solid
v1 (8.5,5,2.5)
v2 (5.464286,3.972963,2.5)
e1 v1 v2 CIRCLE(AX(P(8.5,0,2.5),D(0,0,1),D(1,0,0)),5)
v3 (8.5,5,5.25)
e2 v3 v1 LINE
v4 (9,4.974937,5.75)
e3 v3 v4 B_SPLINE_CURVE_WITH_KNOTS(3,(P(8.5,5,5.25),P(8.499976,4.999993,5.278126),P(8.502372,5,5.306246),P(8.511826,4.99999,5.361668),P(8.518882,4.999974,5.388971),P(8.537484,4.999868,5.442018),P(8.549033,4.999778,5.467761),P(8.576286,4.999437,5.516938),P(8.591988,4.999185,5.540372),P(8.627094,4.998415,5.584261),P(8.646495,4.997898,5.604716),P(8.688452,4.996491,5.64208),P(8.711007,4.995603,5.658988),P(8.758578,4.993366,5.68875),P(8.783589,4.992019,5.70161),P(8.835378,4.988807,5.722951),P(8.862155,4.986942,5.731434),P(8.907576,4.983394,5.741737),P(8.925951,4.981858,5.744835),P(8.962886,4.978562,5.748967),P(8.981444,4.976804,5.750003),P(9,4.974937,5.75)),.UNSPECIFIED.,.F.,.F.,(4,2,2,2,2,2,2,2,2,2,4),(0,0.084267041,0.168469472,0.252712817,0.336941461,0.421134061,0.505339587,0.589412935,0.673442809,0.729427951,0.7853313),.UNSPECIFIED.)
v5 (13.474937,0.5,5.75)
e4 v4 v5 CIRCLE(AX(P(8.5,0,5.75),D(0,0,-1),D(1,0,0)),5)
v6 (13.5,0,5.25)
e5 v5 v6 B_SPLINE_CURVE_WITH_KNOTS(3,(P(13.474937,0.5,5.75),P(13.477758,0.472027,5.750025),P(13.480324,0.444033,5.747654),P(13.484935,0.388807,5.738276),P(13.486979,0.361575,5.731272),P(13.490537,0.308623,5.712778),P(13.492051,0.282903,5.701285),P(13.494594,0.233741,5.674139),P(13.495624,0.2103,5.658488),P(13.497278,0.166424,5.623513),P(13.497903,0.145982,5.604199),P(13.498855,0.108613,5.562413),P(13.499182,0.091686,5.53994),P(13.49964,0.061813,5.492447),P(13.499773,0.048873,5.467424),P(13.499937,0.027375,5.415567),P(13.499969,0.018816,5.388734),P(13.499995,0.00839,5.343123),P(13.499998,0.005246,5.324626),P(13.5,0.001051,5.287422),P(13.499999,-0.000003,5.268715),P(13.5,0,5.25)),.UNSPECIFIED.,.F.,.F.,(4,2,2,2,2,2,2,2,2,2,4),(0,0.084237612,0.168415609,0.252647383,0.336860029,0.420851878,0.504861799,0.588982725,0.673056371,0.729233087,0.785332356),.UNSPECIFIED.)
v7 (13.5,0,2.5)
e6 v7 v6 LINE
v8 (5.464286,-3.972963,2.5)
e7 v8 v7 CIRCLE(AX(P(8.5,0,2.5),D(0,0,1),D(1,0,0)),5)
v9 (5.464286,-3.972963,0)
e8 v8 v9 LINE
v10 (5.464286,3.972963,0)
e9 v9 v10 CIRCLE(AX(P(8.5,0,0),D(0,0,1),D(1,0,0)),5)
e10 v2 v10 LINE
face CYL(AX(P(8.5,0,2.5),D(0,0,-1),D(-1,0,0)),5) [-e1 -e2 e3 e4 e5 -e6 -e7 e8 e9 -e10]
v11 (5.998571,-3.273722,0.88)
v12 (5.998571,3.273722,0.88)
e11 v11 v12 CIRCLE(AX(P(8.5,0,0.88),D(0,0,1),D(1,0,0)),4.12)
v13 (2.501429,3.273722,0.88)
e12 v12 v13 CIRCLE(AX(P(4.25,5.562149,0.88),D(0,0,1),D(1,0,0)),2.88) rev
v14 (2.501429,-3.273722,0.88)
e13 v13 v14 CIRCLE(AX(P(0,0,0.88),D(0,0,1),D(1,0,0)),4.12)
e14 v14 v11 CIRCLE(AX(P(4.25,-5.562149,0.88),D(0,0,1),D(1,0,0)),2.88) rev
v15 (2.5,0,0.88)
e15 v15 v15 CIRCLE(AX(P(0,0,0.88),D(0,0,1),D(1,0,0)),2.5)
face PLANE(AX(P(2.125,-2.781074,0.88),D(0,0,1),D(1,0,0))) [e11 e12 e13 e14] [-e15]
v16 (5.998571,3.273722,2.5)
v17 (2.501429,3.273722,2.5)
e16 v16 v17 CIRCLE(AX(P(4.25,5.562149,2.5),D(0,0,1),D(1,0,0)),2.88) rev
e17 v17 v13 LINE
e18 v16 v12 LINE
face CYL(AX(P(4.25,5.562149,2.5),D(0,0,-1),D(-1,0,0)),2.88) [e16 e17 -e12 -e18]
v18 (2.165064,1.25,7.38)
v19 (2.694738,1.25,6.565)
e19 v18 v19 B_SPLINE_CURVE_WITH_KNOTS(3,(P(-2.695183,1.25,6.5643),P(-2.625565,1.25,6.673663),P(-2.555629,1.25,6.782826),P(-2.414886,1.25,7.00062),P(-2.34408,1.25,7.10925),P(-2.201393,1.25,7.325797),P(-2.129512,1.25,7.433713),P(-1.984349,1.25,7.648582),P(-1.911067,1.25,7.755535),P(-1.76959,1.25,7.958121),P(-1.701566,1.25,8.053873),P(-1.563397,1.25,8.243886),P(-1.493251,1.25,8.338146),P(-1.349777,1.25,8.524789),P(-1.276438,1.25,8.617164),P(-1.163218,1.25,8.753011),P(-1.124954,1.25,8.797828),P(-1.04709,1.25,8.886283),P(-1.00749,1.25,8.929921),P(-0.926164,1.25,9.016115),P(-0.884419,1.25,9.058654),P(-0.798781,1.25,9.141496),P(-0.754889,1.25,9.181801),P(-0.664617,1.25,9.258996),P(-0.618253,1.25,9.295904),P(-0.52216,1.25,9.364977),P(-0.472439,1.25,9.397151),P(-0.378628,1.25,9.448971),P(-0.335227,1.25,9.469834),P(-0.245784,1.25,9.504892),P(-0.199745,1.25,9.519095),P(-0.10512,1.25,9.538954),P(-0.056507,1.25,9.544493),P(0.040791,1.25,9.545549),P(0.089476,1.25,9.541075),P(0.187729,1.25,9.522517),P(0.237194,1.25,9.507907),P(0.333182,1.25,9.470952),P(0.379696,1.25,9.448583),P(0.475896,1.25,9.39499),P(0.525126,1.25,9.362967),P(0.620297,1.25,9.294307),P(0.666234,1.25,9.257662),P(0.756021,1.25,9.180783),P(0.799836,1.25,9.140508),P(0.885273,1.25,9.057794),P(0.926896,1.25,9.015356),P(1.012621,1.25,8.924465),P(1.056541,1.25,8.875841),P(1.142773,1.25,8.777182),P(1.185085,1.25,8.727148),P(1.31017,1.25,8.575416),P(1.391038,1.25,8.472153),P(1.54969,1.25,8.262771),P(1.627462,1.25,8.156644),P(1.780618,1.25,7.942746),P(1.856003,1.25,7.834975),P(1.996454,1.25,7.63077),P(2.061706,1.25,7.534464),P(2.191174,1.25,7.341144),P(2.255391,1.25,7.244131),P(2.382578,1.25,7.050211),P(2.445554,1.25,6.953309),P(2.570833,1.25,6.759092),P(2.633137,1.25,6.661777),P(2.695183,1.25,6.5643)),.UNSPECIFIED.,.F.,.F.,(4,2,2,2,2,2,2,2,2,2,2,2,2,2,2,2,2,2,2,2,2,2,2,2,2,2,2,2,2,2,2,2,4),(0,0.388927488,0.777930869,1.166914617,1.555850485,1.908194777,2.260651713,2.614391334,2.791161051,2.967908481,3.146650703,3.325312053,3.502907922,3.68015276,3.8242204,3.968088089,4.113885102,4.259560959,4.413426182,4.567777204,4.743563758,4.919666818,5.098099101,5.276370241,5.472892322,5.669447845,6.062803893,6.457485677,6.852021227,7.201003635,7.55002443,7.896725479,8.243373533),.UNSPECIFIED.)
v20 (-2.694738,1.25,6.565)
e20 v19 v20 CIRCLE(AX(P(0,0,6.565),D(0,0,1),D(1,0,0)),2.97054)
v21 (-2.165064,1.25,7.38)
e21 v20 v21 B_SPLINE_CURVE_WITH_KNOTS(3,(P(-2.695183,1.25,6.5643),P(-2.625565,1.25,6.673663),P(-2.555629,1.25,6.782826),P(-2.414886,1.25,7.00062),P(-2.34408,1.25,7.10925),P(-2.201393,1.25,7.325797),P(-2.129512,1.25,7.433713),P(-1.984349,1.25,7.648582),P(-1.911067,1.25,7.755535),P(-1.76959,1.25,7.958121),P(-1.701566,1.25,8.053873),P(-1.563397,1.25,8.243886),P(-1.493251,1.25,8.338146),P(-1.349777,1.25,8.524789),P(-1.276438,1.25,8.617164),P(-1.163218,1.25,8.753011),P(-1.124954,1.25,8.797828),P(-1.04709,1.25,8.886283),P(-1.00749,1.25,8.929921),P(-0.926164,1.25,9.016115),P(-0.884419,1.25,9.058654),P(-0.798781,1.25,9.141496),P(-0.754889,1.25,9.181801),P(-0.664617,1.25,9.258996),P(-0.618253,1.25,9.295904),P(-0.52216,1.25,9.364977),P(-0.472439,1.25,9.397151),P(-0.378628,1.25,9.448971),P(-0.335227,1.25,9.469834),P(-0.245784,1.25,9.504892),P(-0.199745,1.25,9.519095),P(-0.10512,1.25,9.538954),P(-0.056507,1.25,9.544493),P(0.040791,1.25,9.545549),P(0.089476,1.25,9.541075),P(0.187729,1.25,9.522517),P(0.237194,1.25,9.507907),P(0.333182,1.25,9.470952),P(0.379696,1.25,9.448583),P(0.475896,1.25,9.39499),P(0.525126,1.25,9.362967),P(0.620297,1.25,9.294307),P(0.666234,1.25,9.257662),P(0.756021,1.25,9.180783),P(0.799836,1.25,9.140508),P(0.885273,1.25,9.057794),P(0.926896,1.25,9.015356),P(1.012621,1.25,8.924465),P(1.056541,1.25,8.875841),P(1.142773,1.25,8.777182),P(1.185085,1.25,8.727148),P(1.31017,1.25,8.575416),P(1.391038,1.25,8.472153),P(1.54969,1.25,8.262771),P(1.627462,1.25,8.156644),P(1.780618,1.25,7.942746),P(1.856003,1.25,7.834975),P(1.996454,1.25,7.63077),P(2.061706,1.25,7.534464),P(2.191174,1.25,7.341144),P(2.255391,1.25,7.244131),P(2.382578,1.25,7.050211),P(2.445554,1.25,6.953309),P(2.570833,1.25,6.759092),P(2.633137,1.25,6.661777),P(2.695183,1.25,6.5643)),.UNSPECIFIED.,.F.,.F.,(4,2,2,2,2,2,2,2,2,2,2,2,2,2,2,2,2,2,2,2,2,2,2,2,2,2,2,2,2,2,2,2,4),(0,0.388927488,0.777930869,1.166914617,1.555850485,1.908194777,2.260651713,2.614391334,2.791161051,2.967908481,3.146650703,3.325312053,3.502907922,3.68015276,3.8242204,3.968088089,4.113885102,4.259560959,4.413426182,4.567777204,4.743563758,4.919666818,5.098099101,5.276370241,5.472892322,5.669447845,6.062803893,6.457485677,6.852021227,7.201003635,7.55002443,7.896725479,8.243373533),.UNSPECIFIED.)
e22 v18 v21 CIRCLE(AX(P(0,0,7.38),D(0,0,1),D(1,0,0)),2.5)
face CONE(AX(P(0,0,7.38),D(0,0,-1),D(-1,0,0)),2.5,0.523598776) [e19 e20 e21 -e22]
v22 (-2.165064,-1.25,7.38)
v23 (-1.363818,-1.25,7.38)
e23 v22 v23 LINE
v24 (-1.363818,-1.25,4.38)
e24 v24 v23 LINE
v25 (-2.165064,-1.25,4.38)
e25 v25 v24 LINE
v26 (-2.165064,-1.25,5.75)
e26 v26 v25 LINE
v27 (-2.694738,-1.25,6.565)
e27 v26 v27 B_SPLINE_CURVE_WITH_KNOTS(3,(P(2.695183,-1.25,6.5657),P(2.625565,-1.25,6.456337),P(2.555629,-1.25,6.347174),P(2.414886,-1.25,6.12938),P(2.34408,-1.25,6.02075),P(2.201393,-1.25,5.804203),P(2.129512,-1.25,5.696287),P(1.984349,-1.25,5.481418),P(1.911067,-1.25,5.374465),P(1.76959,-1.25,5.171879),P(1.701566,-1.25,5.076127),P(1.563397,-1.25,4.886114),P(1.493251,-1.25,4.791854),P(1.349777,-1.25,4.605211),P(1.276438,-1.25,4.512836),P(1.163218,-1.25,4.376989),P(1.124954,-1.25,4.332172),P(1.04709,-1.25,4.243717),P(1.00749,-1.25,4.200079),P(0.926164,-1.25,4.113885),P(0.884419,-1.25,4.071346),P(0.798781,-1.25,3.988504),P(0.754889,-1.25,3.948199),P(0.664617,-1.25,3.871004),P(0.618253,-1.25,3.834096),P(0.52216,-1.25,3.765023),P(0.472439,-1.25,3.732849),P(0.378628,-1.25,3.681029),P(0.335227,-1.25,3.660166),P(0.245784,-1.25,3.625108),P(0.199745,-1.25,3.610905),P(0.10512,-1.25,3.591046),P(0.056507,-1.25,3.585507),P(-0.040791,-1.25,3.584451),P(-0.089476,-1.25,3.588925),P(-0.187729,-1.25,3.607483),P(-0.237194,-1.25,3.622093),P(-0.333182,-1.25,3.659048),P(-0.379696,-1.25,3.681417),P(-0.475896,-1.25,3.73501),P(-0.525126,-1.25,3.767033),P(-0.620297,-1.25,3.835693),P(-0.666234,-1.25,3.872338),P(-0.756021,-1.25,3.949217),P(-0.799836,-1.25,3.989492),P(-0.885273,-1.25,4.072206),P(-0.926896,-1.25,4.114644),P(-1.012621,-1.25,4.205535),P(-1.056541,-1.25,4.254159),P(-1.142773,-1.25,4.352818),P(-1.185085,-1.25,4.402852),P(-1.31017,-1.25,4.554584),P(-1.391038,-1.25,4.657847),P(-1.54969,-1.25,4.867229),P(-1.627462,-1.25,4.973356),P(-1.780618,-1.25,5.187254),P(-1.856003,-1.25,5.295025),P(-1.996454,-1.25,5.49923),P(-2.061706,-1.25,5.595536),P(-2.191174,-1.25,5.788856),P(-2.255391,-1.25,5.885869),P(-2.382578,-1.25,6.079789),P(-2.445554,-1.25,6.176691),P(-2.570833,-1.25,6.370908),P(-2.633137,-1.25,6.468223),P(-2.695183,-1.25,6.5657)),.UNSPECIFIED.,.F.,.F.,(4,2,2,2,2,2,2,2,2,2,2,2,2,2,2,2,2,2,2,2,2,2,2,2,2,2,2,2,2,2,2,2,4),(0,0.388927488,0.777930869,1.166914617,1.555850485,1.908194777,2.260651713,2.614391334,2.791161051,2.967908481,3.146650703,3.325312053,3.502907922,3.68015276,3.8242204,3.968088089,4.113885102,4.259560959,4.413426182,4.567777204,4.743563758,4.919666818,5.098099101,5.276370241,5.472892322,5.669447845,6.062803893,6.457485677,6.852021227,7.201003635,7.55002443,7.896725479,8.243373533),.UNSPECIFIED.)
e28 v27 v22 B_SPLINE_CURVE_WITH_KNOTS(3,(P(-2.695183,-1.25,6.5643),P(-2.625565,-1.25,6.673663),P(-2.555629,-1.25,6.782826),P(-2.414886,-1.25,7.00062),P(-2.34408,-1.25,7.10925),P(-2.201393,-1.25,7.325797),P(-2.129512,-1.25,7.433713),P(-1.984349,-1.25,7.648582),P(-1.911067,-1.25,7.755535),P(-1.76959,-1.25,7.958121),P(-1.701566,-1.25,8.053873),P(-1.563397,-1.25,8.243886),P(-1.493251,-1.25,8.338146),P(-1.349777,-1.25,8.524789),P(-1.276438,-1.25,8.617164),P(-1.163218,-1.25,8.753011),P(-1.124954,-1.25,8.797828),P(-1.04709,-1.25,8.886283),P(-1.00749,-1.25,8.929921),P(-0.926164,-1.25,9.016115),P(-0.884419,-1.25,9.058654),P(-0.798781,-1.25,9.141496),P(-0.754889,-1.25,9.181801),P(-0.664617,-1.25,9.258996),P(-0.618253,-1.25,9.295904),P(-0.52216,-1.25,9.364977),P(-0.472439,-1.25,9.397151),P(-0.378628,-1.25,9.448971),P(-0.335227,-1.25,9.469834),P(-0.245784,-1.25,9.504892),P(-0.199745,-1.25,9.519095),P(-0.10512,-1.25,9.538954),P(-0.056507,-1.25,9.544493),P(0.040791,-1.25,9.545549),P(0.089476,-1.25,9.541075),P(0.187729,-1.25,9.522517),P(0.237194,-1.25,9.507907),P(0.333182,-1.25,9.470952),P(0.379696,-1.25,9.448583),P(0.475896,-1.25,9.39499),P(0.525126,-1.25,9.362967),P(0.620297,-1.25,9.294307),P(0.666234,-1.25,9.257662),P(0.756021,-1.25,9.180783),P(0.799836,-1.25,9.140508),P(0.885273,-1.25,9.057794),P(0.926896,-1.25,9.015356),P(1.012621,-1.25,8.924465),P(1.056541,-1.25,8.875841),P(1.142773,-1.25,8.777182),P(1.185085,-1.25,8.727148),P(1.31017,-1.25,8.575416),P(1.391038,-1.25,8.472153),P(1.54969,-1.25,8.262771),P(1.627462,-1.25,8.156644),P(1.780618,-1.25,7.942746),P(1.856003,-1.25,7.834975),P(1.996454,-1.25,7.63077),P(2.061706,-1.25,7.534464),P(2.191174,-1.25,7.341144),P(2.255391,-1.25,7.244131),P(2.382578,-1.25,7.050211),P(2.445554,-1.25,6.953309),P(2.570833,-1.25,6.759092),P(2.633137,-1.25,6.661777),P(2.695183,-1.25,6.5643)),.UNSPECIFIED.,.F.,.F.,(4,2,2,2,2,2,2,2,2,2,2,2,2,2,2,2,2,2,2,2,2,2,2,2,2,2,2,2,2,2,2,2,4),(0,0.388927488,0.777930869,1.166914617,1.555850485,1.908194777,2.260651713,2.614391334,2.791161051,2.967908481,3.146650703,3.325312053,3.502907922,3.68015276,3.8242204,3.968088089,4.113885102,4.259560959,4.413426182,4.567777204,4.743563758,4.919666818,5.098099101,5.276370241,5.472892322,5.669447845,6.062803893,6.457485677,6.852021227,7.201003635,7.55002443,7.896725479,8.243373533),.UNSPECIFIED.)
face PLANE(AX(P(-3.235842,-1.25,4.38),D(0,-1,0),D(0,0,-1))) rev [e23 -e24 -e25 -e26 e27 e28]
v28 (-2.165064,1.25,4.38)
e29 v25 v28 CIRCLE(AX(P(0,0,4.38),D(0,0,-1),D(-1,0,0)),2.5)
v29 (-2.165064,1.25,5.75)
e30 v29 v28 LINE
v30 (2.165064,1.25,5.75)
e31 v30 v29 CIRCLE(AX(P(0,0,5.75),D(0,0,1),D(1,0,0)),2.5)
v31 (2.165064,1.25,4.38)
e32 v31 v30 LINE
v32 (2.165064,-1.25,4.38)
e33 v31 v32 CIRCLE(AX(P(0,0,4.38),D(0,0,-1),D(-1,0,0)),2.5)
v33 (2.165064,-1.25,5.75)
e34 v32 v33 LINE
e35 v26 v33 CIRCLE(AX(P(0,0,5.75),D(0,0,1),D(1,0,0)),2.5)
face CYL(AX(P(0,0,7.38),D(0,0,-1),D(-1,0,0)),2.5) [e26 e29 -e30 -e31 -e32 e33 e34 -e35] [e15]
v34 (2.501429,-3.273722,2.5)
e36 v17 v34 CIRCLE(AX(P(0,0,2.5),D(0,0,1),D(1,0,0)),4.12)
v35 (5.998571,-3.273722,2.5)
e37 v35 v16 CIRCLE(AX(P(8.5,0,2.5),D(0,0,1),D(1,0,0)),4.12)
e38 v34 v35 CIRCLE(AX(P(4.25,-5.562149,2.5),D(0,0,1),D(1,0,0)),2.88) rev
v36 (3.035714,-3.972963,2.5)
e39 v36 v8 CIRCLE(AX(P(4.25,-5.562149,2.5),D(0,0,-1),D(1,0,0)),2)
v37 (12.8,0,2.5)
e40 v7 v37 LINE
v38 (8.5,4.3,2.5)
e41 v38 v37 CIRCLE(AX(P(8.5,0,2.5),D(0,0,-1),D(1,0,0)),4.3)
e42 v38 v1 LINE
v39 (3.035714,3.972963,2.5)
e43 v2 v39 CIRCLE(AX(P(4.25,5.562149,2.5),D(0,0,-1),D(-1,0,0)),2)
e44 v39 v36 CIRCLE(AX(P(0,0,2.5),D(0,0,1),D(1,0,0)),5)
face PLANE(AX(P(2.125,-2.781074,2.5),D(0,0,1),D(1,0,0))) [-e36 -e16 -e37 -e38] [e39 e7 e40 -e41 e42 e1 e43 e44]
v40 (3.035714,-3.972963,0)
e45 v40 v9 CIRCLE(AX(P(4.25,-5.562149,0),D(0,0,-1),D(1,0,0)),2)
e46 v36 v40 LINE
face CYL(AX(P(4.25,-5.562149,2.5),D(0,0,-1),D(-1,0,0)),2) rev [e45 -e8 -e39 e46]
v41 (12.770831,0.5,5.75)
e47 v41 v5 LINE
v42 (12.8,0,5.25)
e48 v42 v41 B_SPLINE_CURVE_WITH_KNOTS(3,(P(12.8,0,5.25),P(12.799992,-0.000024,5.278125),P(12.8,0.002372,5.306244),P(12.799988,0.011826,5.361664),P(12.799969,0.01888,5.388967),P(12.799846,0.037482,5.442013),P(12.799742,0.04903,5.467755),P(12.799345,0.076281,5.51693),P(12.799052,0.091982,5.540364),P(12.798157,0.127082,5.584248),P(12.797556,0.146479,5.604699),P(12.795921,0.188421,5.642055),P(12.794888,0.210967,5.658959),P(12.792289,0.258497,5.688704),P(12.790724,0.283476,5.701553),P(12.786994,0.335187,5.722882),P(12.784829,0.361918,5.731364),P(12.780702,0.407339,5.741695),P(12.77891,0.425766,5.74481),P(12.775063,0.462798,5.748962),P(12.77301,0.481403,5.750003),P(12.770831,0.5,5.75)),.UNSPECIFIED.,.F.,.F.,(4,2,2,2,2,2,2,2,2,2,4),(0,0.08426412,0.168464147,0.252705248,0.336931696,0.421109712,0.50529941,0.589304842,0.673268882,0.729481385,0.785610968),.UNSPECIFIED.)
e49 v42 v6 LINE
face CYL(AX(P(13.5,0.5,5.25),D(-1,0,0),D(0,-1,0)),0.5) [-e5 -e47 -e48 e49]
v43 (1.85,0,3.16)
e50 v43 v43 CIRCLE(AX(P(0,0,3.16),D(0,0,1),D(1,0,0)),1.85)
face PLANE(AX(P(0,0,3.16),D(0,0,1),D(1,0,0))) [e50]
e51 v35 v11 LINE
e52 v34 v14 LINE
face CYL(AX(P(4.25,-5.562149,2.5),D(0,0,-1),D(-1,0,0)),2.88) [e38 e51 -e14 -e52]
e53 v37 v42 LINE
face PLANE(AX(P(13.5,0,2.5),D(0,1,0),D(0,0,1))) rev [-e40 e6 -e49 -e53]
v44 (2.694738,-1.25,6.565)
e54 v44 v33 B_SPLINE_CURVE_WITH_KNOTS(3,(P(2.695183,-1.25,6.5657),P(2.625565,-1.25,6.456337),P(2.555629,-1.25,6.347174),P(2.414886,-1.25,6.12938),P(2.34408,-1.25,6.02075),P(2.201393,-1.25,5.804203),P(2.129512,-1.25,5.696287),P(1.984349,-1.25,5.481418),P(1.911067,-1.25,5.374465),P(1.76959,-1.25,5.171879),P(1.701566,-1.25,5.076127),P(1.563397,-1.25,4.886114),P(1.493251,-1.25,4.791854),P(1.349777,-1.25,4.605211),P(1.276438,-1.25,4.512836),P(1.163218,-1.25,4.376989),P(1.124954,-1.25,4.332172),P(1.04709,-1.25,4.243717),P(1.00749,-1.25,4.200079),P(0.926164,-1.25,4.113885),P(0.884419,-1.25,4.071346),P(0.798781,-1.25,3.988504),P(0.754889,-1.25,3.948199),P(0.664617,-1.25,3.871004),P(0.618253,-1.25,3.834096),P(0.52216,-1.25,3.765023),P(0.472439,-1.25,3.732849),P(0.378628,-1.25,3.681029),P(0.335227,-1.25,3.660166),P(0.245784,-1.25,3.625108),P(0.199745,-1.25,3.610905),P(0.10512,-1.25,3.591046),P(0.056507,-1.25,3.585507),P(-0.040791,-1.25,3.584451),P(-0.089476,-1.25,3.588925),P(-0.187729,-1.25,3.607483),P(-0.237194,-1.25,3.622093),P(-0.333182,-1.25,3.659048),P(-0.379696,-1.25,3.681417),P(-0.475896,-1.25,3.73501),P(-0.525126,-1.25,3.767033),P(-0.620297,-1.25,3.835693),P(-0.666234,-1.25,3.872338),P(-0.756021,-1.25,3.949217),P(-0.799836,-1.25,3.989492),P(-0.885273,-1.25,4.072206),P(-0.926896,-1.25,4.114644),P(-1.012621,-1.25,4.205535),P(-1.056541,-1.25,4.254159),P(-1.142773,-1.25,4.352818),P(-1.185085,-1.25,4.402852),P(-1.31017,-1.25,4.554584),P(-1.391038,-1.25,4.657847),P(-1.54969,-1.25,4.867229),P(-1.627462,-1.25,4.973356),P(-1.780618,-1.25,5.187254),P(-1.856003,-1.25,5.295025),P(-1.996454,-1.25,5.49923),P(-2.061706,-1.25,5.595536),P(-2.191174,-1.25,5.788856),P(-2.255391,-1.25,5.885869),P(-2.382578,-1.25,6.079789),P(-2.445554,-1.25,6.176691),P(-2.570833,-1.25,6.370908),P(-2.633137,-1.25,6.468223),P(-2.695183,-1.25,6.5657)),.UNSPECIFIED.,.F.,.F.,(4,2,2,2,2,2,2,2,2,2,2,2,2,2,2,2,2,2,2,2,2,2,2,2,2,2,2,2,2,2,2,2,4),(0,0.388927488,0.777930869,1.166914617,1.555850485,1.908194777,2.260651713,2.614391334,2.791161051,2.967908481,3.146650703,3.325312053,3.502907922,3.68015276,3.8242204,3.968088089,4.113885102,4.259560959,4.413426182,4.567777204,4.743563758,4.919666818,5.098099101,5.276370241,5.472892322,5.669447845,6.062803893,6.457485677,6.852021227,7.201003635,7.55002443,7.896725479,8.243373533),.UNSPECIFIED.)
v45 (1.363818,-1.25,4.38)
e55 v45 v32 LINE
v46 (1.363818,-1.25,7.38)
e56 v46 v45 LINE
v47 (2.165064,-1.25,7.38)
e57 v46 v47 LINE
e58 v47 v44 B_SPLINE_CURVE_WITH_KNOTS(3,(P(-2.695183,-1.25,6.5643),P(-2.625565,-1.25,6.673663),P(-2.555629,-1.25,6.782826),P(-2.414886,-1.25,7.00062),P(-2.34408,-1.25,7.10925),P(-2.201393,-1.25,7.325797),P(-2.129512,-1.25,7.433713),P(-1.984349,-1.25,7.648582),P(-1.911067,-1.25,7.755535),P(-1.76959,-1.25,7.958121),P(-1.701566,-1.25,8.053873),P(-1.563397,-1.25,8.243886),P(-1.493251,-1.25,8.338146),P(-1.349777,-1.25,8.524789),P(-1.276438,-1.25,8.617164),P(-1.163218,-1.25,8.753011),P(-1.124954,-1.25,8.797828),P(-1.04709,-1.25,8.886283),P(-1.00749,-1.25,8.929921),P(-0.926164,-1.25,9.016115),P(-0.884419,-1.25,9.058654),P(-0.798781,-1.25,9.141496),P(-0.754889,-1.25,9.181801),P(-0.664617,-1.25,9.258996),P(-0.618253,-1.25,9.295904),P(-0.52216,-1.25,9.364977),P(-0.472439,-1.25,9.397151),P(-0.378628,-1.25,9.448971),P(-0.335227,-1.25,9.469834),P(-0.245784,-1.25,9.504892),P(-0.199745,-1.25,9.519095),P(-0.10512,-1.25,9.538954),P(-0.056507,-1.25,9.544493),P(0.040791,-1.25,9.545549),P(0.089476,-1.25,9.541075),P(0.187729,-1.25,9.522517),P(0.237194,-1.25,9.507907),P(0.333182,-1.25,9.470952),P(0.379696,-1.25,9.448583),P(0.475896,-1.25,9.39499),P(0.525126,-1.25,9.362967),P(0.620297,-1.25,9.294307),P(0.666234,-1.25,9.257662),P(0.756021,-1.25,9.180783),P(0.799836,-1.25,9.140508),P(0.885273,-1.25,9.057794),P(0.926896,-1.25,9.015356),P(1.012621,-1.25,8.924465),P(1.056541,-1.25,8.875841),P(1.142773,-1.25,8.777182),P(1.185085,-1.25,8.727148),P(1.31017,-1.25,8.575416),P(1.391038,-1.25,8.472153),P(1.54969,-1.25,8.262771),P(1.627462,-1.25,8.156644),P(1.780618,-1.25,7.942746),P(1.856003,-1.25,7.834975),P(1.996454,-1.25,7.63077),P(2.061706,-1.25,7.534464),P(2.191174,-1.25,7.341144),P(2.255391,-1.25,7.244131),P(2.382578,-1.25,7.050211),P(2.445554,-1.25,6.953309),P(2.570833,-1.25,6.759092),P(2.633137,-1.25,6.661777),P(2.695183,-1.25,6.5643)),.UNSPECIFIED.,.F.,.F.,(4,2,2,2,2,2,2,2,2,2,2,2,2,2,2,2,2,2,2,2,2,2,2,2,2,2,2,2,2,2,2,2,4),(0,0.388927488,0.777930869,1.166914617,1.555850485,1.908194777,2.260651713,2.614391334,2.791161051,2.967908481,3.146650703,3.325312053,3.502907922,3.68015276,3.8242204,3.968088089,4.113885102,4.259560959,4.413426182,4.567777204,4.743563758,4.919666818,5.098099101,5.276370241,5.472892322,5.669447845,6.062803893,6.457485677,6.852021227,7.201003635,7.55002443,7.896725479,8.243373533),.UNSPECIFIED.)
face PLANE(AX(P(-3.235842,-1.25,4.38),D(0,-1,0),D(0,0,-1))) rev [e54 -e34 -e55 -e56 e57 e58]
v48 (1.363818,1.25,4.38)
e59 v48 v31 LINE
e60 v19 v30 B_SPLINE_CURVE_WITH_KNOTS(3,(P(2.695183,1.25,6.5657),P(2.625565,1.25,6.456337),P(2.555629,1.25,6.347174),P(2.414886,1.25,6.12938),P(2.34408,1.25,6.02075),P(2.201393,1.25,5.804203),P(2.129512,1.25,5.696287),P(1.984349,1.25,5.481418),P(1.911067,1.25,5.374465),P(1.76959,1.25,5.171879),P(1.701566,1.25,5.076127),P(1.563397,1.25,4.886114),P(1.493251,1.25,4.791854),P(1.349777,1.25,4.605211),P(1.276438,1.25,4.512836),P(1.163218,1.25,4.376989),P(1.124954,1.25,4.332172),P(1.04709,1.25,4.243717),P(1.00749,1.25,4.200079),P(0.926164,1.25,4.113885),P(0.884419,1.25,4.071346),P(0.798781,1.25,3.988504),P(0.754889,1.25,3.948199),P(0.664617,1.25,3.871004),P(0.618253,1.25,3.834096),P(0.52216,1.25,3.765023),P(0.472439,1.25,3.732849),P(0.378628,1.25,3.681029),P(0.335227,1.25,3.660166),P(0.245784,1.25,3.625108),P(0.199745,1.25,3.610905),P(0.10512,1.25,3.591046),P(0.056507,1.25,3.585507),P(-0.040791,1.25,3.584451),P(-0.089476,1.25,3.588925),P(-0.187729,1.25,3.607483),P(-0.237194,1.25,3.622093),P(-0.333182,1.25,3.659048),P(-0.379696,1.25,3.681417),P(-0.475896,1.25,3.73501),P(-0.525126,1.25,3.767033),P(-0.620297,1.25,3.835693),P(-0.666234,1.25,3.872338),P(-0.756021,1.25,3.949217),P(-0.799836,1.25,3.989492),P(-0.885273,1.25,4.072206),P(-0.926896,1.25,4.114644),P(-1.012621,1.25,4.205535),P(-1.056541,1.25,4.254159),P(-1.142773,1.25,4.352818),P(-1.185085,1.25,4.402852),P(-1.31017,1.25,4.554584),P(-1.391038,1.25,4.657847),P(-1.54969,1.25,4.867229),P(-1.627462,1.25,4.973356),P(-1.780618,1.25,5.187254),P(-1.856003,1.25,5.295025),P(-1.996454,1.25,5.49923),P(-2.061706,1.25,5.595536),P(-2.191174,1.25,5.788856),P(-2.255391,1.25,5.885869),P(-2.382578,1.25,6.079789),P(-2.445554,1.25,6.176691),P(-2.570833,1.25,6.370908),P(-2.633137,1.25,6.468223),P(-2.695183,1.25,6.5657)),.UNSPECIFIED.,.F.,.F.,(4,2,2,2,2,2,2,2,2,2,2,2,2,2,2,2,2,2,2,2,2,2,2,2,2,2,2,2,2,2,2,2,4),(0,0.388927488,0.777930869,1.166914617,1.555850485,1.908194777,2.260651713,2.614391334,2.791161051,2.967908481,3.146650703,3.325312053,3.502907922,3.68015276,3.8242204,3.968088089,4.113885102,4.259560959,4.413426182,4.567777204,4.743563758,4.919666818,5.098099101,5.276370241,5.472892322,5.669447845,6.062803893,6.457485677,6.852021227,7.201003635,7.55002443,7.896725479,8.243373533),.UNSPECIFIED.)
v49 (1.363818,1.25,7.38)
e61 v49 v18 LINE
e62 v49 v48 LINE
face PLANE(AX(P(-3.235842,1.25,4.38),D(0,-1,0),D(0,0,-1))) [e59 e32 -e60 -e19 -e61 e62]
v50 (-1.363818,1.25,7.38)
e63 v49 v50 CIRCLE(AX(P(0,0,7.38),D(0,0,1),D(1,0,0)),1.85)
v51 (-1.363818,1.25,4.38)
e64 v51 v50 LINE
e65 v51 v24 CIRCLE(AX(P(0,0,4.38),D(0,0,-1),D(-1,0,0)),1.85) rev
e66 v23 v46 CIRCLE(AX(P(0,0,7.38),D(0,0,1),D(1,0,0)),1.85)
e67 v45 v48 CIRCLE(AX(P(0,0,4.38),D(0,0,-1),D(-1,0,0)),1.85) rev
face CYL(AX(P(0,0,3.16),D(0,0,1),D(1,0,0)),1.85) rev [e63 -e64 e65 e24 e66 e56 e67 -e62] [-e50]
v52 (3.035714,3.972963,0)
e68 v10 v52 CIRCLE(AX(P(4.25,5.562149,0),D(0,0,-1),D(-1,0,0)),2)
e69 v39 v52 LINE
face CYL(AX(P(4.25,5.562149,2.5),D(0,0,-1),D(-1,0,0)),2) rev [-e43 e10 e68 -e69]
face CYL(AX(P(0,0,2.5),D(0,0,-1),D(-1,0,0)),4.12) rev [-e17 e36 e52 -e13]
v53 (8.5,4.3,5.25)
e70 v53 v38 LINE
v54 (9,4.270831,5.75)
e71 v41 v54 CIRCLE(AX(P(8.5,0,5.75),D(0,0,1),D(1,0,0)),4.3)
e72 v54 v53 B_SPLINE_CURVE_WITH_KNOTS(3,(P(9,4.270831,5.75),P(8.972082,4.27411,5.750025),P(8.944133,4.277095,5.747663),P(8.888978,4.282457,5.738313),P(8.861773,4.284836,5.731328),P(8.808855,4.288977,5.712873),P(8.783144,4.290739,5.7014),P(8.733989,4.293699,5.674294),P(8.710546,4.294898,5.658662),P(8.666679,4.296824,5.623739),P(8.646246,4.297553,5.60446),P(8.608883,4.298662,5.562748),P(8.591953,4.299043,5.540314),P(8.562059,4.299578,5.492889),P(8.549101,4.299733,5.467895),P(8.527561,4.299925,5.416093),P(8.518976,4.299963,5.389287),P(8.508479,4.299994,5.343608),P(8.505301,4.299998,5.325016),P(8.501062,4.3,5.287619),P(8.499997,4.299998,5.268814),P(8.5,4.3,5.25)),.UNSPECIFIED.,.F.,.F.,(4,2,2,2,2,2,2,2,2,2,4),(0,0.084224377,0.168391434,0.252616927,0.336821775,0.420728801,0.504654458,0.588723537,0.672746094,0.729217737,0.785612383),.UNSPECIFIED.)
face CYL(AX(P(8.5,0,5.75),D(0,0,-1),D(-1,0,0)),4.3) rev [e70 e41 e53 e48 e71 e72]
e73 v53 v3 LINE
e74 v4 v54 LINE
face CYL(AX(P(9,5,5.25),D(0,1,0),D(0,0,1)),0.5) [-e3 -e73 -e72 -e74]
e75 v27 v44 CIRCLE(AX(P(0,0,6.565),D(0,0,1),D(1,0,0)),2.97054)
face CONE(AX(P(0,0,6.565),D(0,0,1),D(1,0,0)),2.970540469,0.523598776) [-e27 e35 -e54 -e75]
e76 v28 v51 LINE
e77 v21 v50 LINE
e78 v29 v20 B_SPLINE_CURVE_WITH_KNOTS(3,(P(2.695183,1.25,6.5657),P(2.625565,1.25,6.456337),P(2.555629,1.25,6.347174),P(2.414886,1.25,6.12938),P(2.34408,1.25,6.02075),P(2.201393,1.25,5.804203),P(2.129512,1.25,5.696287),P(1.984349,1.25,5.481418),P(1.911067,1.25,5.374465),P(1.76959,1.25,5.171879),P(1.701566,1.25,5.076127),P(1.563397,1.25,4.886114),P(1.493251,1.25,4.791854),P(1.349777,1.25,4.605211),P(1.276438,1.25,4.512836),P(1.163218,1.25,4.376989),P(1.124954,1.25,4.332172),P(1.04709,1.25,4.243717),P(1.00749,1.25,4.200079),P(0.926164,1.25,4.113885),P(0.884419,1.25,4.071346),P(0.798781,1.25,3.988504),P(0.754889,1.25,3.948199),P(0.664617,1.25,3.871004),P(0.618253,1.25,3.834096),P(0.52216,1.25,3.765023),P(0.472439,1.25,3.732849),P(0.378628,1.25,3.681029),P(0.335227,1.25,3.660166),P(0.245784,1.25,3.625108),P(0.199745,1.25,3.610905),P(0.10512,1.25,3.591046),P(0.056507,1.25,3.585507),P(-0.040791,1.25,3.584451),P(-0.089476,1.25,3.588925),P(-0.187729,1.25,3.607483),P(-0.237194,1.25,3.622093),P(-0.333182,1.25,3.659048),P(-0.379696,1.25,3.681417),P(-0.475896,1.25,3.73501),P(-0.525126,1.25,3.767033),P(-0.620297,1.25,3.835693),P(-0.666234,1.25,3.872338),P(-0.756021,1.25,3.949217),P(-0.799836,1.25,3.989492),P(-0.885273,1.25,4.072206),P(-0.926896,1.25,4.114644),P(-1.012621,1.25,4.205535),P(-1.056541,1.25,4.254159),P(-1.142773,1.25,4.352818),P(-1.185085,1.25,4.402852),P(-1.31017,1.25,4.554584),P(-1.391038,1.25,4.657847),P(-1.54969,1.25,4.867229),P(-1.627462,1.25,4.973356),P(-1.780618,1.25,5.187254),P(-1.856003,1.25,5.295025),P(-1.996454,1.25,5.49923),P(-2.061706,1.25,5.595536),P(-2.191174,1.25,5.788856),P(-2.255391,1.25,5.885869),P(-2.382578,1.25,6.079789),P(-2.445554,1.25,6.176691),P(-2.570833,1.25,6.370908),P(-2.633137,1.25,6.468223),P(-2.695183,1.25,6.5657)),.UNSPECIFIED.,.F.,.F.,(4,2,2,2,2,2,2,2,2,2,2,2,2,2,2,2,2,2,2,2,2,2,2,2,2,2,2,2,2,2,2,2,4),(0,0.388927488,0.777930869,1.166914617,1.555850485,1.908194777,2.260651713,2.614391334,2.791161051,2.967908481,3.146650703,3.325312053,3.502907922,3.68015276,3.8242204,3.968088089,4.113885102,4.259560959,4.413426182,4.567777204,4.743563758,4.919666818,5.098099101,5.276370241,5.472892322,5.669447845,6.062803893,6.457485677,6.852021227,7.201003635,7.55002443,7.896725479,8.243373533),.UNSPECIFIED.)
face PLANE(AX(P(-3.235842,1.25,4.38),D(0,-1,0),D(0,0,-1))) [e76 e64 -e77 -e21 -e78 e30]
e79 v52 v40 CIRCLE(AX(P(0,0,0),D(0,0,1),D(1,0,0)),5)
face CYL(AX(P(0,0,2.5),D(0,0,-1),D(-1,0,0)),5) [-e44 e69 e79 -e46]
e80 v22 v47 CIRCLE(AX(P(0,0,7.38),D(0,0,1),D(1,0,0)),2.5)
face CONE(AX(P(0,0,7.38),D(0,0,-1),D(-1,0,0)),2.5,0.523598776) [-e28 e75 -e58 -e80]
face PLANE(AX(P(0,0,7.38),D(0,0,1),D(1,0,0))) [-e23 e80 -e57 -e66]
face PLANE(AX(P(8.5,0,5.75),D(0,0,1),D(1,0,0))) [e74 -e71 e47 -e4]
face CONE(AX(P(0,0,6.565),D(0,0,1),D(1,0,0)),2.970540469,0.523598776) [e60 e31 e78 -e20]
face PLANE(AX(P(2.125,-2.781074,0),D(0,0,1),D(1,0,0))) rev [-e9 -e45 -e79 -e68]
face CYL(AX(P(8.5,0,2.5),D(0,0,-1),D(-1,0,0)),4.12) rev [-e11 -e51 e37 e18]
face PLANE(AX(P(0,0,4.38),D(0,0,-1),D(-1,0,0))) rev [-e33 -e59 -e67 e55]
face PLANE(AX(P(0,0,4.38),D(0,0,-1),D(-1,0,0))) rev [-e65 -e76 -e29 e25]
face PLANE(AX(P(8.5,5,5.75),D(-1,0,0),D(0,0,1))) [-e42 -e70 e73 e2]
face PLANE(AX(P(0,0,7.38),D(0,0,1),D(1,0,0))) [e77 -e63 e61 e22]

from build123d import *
from build123d.topology import SkipClean

# Parameters (mm, degrees)
BOSS_EXTRUDE1_DEPTH = 2.5
SHELL1_T            = -0.88
BOSS_EXTRUDE2_DEPTH = 3.25
FILLET1_R           = 0.5
FILLET2_R           = 0.5
SKETCH3_R           = 2.5
BOSS_EXTRUDE3_DEPTH = 6.5
SKETCH5_R           = 1.85
CUT_EXTRUDE1_DEPTH  = 4.22
SKETCH8_W           = 6.47168307
SKETCH8_H           = 2.5
CUT_EXTRUDE2_DEPTH  = 3
SKETCH9_W           = 5
SKETCH9_H           = 5
CUT_EXTRUDE3_DEPTH  = 3.25


# Read off the part's stored shape, not the designer's step: Mirror1
with BuildPart() as part:
    # Sketch1 → Boss-Extrude1 (new body)
    with BuildSketch(Plane.XY):
        with BuildLine():
            ThreePointArc((3.035714286, 3.972963475), (-5, 0), (3.035714286, -3.972963475))
            ThreePointArc((3.035714286, -3.972963475), (4.25, -3.562148865), (5.464285714, -3.972963475))
            ThreePointArc((5.464285714, -3.972963475), (13.5, 0), (5.464285714, 3.972963475))
            ThreePointArc((5.464285714, 3.972963475), (4.25, 3.562148865), (3.035714286, 3.972963475))
        make_face()
    extrude(amount=BOSS_EXTRUDE1_DEPTH)

    # Shell1
    shell1_openings = [part.faces().sort_by_distance(p)[0] for p in [
        (4.25, 0, 2.5),
    ]]
    offset(amount=SHELL1_T, openings=shell1_openings, kind=Kind.INTERSECTION)

    # Sketch2 → Boss-Extrude2 (add)
    with BuildSketch(Plane.XY.offset(2.5)):
        with BuildLine():
            Line((13.5, 0), (12.8, 0))
            ThreePointArc((12.8, 0), (11.540559159, -3.040559159), (8.5, -4.3))
            Line((8.5, -4.3), (8.5, -5))
            ThreePointArc((8.5, -5), (12.035533906, -3.535533906), (13.5, 0))
        make_face()
    extrude(amount=BOSS_EXTRUDE2_DEPTH)

    # Fillet1
    fillet1_edges = [part.edges().sort_by_distance(p)[0] for p in [
        (8.5, -4.65, 5.75),
    ]]
    fillet(fillet1_edges, radius=FILLET1_R)

    # Fillet2
    fillet2_edges = [part.edges().sort_by_distance(p)[0] for p in [
        (13.15, 0, 5.75),
    ]]
    fillet(fillet2_edges, radius=FILLET2_R)

    # Sketch3 → Boss-Extrude3 (add)
    with BuildSketch(Plane.XY.offset(0.88)):
        with Locations(Location((0, 0, 0), (0, 0, 180))):
            Circle(SKETCH3_R)
    extrude(amount=BOSS_EXTRUDE3_DEPTH)

    # Sketch5 → Cut-Extrude1 (cut)
    with BuildSketch(Plane.XY.offset(7.38)):
        Circle(SKETCH5_R)
    extrude(amount=-CUT_EXTRUDE1_DEPTH, mode=Mode.SUBTRACT)

    # Sketch6 → Revolve1 (revolve)
    with BuildSketch(Plane(origin=(0, 0, 0), x_dir=(1, 0, 0), z_dir=(0, 1, 0))):
        Polygon((2.5, -5.75), (2.5, -7.38), (2.970540469, -6.565), align=None)
    revolve(axis=Axis((0, 0, 7.38), (0, 0, -1)))

    # Sketch8 → Cut-Extrude2 (cut)
    with BuildSketch(Plane.XY.offset(7.38)):
        Rectangle(SKETCH8_W, SKETCH8_H)
    extrude(amount=-CUT_EXTRUDE2_DEPTH, mode=Mode.SUBTRACT)

    # Mirror1: part across plane


with BuildPart() as part_1:
    with SkipClean():  # the faces are left unmerged after this step: merging them gives an invalid solid
        add(part.part)
        add(part.part.mirror(Plane.ZX))

    # Sketch9 → Cut-Extrude3 (cut)
    with SkipClean():  # the faces are left unmerged after this step: merging them gives an invalid solid
        with BuildSketch(Plane.XY.offset(5.75)):
            with Locations((11, -2.5)):
                Rectangle(SKETCH9_W, SKETCH9_H)
        extrude(amount=-CUT_EXTRUDE3_DEPTH, mode=Mode.SUBTRACT)


solid = part_1.part
